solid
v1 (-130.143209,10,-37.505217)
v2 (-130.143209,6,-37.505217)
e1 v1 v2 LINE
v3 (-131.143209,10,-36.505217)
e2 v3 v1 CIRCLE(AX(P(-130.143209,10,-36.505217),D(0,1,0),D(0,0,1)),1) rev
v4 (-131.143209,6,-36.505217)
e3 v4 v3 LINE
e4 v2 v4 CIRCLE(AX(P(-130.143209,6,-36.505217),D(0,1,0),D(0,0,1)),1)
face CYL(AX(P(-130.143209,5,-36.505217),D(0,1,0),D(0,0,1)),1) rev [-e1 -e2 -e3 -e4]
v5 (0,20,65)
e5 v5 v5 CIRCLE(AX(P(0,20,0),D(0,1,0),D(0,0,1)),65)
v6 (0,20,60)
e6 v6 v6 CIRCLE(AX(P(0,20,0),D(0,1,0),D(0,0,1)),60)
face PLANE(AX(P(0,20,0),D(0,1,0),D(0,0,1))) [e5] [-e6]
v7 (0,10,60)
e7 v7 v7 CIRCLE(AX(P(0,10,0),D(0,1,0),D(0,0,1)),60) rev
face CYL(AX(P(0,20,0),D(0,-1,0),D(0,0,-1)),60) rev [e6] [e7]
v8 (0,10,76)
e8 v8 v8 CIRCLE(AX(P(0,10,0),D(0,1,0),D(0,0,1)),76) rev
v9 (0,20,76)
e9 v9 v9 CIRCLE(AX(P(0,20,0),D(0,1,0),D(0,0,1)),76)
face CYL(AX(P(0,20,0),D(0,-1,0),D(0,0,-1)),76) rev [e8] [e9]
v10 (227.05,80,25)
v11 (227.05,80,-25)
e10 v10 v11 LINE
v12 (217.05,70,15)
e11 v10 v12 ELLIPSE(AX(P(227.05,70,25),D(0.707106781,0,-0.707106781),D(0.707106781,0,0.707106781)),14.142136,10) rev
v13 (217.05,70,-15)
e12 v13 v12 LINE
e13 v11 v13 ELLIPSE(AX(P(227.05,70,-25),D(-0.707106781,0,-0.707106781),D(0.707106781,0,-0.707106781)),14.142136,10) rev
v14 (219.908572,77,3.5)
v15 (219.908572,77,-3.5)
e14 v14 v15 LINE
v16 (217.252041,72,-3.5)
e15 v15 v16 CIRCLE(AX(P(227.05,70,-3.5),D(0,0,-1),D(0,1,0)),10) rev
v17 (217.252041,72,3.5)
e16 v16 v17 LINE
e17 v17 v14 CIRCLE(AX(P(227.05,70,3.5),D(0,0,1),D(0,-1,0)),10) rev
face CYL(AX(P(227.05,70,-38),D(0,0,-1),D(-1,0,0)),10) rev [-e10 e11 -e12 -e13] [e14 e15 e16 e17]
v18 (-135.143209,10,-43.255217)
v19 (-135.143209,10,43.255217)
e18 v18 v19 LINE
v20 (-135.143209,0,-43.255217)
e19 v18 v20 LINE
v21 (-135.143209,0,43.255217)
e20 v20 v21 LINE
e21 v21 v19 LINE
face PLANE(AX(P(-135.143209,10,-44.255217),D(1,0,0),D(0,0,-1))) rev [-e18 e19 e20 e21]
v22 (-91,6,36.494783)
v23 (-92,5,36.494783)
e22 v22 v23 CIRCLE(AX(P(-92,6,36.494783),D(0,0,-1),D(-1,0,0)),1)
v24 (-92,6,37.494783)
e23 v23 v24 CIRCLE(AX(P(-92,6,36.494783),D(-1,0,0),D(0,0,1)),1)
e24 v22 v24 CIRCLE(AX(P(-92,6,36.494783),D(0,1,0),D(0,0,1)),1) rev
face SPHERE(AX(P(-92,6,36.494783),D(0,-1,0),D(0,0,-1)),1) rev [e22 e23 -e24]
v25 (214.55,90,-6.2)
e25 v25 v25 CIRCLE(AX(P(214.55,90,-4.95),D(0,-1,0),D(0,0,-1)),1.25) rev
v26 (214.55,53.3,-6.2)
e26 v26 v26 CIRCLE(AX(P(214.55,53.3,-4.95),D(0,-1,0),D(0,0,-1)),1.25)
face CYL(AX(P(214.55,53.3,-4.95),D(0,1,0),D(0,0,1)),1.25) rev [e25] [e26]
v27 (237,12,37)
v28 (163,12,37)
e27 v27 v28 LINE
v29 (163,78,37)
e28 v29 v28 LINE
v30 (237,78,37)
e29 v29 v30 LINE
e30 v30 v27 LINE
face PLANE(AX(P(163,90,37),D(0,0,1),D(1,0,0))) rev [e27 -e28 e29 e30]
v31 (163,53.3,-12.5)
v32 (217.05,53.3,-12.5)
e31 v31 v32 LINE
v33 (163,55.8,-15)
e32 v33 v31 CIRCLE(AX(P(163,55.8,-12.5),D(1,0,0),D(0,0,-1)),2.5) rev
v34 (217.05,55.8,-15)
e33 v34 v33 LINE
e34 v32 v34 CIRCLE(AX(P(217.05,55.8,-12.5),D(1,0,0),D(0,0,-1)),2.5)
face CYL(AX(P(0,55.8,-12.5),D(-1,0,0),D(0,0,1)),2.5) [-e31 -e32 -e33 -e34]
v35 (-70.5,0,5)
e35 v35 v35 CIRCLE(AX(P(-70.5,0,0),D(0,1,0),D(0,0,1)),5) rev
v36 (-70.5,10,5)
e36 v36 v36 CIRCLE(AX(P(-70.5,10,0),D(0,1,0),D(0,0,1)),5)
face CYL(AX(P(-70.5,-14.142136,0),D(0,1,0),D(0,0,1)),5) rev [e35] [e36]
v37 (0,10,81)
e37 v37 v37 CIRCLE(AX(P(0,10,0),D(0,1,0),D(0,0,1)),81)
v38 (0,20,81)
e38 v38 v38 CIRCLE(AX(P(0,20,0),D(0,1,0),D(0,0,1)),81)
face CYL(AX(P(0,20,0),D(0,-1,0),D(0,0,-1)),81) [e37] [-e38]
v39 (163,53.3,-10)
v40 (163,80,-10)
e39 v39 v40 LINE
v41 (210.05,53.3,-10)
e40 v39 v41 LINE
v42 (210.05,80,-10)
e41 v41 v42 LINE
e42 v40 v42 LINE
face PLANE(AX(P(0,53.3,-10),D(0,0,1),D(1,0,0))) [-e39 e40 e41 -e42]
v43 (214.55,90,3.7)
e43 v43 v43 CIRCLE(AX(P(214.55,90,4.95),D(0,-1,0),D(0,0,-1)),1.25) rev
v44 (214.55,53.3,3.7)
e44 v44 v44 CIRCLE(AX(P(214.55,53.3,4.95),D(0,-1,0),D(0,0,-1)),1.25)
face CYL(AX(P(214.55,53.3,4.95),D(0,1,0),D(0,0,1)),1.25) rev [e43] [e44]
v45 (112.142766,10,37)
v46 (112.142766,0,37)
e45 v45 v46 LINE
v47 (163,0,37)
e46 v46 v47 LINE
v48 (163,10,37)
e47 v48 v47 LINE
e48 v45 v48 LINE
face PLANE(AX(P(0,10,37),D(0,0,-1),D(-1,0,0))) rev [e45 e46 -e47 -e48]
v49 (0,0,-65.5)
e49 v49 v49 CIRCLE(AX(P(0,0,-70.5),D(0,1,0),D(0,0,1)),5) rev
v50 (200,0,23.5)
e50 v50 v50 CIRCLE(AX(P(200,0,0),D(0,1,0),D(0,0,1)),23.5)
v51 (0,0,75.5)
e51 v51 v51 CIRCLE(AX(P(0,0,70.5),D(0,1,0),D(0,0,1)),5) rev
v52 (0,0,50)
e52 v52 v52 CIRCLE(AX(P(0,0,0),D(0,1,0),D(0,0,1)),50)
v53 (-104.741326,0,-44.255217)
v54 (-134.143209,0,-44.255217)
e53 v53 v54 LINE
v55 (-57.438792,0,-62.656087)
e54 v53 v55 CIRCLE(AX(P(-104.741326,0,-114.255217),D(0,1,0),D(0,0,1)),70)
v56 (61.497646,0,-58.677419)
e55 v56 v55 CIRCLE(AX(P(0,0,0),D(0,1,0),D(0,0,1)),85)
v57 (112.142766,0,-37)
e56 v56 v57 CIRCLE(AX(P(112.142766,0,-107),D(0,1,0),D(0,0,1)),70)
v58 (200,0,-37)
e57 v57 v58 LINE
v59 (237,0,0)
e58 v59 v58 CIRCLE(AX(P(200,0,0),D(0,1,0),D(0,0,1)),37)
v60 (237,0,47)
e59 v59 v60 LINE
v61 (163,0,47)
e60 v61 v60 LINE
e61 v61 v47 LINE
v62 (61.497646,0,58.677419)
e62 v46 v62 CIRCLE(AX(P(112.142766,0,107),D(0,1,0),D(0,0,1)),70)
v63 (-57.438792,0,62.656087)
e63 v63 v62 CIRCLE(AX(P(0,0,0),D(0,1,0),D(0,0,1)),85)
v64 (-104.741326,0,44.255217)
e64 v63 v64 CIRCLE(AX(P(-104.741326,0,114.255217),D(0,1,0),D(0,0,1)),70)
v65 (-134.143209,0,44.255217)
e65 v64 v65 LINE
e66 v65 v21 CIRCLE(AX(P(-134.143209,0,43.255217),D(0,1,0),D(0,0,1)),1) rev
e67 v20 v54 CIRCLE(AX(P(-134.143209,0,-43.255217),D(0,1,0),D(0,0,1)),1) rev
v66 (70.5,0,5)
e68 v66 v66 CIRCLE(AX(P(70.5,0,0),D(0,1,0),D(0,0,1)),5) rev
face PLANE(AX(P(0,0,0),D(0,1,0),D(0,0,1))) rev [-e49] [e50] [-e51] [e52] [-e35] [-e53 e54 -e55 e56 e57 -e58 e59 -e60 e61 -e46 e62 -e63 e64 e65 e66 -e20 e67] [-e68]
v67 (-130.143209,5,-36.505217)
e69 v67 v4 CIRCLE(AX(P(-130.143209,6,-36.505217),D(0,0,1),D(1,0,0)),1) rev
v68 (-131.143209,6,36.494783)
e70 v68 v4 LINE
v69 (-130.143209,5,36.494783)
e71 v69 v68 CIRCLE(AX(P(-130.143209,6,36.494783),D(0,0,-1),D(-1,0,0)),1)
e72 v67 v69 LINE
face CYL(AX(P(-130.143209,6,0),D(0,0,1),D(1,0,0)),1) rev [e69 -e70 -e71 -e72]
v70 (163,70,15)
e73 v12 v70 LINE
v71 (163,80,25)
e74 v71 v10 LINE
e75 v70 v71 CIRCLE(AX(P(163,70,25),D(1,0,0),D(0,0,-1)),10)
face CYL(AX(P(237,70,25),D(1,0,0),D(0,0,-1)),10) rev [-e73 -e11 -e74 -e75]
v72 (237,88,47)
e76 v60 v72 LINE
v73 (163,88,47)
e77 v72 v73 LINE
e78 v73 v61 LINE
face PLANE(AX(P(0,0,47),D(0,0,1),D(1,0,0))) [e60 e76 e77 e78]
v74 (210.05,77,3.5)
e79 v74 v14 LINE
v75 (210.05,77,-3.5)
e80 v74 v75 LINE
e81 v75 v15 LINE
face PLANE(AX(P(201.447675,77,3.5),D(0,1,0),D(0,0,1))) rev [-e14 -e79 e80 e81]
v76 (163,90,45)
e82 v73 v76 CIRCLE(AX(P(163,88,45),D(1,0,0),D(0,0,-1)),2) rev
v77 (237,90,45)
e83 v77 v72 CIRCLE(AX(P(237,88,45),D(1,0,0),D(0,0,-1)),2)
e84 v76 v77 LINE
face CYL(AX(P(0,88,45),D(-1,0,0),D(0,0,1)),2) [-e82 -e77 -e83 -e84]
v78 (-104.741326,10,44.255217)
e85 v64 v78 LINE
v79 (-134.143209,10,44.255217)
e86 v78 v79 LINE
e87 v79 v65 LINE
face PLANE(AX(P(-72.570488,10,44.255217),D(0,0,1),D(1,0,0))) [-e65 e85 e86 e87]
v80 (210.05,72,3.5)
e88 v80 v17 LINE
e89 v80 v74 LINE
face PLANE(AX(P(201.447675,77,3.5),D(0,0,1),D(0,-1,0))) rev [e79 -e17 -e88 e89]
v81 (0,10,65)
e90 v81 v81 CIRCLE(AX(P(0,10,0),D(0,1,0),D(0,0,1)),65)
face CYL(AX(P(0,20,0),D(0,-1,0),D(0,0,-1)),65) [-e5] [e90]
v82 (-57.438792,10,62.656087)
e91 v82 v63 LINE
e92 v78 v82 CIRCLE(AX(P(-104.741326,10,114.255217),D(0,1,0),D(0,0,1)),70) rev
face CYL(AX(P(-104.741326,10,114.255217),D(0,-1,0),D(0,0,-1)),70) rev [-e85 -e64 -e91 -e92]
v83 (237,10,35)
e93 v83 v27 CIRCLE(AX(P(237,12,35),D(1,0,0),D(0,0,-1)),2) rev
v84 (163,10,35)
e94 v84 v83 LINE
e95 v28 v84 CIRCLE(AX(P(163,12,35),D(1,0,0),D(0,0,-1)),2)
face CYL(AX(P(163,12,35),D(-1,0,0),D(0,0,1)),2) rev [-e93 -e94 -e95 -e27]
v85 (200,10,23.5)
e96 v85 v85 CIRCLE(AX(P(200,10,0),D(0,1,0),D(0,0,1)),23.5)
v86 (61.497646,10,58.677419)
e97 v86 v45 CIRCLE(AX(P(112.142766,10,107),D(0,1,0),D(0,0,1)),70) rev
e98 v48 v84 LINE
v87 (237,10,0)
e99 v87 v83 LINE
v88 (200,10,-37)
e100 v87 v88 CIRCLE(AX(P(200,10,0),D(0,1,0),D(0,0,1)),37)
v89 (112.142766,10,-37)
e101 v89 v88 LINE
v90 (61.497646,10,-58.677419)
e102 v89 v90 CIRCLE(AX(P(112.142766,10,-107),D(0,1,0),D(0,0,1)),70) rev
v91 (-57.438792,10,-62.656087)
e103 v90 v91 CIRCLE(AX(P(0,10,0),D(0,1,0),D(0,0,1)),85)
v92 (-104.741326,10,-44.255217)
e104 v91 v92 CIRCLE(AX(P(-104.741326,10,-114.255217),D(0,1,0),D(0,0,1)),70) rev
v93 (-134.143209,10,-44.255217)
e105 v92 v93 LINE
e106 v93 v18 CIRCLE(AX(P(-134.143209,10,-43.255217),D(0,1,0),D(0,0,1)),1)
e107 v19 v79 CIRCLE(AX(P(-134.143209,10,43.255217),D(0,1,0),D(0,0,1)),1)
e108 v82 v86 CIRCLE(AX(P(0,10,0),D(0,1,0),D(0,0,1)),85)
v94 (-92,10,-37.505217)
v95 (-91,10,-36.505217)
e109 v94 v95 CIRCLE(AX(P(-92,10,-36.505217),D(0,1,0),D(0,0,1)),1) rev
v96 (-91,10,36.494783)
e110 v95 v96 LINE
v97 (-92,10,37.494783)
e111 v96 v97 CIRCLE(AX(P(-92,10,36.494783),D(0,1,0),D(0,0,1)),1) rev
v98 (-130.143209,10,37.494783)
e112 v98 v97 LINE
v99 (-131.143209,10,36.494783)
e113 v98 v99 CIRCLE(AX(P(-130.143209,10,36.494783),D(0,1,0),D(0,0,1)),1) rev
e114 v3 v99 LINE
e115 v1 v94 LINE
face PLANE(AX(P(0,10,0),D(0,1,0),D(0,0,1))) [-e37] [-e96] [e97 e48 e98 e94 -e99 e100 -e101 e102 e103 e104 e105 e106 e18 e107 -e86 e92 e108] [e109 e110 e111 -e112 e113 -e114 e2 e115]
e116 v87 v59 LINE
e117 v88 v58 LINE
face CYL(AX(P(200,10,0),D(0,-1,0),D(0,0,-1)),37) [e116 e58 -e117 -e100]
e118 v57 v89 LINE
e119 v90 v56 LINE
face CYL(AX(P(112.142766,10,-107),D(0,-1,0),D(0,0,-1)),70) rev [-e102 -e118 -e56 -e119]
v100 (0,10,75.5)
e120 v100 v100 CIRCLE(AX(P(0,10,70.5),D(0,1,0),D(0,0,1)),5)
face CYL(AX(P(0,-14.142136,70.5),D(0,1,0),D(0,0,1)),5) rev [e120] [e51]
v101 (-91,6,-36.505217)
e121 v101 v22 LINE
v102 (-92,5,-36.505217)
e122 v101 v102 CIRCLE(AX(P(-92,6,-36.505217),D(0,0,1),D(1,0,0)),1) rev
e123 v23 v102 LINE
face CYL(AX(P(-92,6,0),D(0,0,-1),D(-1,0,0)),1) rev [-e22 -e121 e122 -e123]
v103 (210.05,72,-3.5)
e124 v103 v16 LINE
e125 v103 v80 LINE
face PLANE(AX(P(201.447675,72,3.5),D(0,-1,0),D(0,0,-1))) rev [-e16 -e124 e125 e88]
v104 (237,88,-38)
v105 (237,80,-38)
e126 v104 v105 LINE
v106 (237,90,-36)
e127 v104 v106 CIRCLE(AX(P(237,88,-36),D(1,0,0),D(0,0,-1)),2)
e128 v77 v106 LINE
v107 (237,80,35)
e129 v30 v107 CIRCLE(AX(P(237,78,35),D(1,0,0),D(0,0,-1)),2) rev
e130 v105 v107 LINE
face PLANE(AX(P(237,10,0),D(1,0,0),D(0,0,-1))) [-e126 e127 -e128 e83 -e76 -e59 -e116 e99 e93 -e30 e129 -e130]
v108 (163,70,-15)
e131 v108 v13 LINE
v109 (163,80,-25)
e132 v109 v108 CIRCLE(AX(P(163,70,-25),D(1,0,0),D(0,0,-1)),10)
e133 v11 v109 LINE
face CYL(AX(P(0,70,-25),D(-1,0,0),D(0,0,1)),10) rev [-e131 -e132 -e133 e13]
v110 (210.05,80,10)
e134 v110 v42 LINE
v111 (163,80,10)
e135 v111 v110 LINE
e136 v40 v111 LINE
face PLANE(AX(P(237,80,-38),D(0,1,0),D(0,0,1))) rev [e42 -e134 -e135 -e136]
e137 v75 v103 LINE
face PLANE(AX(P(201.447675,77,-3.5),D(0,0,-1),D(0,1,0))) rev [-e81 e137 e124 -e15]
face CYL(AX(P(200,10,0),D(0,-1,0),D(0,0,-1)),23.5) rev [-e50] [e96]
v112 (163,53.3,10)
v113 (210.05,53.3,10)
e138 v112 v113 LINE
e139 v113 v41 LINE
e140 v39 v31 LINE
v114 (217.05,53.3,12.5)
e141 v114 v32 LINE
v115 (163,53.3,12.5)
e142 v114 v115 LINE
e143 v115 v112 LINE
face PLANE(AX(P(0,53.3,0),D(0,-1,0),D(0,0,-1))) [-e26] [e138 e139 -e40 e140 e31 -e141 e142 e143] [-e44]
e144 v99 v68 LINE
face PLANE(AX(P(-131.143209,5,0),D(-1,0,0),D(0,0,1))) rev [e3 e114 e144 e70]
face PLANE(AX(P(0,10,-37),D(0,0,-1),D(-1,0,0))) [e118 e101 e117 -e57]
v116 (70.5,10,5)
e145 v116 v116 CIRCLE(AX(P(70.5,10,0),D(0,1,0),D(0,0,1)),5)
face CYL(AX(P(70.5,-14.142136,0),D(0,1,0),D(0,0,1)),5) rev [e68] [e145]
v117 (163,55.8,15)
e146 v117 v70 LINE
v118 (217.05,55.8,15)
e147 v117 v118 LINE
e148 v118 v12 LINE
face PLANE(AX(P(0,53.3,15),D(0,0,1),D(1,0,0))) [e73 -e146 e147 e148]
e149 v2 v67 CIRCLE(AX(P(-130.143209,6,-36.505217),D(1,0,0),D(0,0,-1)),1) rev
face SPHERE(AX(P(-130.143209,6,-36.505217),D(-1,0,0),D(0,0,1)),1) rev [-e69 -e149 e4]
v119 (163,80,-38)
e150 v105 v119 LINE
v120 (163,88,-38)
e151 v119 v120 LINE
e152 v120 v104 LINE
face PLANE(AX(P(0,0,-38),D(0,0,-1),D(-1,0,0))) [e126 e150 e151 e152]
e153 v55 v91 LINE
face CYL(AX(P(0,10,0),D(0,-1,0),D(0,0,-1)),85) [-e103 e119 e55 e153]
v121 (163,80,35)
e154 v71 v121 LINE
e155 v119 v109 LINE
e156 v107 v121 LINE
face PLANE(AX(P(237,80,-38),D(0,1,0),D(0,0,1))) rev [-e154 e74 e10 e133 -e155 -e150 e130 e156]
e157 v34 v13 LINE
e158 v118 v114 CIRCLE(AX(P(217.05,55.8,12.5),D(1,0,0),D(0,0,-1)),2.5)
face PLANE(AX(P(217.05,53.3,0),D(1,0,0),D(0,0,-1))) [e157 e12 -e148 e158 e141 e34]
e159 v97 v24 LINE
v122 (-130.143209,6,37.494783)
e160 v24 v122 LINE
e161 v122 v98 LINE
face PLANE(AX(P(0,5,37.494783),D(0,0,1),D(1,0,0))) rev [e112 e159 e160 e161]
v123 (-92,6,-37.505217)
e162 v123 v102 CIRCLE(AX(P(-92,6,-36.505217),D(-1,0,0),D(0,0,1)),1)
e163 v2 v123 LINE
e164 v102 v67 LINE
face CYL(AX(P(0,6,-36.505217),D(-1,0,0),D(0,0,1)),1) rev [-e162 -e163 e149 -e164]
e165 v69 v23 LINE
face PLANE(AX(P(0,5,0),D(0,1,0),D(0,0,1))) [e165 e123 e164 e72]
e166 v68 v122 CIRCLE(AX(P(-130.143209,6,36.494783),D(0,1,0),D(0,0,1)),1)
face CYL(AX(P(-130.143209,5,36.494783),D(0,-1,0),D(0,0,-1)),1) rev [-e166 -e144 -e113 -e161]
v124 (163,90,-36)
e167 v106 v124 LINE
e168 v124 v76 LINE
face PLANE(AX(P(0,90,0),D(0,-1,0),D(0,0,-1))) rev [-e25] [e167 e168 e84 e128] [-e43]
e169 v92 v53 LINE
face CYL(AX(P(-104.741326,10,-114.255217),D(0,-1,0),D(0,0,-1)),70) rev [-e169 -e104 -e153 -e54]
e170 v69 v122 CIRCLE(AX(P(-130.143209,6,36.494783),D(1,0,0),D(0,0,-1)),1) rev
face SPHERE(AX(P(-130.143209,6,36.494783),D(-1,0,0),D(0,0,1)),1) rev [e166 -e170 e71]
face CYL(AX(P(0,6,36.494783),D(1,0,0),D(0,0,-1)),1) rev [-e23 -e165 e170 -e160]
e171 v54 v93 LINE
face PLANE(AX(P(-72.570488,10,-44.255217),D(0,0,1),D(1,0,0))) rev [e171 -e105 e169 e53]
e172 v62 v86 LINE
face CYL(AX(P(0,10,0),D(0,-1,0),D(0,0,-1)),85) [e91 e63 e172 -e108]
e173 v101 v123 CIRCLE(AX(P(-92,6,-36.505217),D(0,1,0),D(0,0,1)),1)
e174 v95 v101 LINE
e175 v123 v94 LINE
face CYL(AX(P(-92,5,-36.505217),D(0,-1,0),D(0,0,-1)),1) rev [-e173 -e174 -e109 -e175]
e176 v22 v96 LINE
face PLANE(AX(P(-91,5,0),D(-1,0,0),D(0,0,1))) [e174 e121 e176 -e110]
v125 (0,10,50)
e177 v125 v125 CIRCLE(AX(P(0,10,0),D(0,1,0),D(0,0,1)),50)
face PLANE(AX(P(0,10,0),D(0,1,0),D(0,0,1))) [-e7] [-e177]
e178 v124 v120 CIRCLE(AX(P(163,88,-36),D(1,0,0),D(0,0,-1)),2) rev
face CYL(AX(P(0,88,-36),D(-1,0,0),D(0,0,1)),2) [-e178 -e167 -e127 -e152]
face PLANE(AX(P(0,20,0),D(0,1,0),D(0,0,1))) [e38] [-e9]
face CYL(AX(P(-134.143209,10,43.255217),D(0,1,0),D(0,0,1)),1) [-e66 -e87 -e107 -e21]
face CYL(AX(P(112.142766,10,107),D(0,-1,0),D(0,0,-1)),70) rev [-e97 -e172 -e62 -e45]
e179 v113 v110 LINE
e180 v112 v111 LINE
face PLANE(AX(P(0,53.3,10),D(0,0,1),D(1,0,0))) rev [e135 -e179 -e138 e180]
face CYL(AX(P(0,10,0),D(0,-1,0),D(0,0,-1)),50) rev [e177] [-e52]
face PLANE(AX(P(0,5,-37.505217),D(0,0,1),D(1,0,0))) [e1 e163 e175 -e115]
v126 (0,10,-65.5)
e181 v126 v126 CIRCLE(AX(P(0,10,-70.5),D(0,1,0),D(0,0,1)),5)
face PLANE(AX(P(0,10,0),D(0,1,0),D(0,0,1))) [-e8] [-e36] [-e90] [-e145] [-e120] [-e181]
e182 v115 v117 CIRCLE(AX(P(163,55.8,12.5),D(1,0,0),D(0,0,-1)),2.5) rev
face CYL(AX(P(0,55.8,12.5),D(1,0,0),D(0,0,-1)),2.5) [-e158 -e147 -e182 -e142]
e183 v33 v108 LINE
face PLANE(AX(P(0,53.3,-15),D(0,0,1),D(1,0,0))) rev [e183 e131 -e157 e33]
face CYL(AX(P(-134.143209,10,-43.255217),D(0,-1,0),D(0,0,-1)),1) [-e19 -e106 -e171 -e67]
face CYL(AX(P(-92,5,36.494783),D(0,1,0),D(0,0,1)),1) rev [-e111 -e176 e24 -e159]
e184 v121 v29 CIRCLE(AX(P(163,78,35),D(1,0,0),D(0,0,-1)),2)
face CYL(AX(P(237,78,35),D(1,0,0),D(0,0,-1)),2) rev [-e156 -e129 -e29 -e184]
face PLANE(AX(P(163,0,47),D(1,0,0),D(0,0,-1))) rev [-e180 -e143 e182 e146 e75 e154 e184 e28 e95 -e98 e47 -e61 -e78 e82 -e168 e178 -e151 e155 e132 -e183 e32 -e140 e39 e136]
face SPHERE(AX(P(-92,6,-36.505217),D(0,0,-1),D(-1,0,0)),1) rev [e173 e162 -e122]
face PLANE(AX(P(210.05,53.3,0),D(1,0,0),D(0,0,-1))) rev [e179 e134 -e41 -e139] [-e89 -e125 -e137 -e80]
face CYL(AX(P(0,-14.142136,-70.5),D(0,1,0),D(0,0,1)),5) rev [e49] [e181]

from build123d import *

# Parameters (mm, degrees)
CROQUIS1_R                   = 50
CROQUIS1_R_2                 = 23.5
SALIENTE_EXTRUIR1_DEPTH      = 10
REDONDEO1_R                  = 70
CROQUIS2_R                   = 81
CROQUIS2_R_2                 = 76
SALIENTE_EXTRUIR2_DEPTH      = 10
CROQUIS8_W                   = 74
CROQUIS8_H                   = 10
SALIENTE_EXTRUIR4_DEPTH      = 10
CROQUIS9_W                   = 74
CROQUIS9_H                   = 10
SALIENTE_EXTRUIR5_DEPTH      = 80
CROQUIS10_W                  = 74
CROQUIS10_H                  = 10
SALIENTE_EXTRUIR6_DEPTH      = 75
REDONDEO3_R                  = 2
REDONDEO4_R                  = 2
REDONDEO5_R                  = 2
REDONDEO6_R                  = 2
CROQUIS12_R                  = 65
CROQUIS12_R_2                = 60
SALIENTE_EXTRUIR12_DEPTH     = 10
CROQUIS13_R                  = 5
CORTAR_EXTRUIR1_DEPTH        = 10
SALIENTE_EXTRUIR13_OUTLINE_R = 1.25
SALIENTE_EXTRUIR13_DEPTH     = 26.7
REDONDEO7_R                  = 10
CORTAR_EXTRUIR2_START        = -36.7
CROQUIS15_R                  = 1.25
CORTAR_EXTRUIR2_DEPTH        = 36.7
REDONDEO9_R                  = 2.5
CROQUIS17_W                  = 7
CROQUIS17_H                  = 5
CORTAR_EXTRUIR3_DEPTH        = 26.95
CROQUIS18_W                  = 40.143208987
CROQUIS18_H                  = 75
CORTAR_EXTRUIR4_DEPTH        = 5
REDONDEO10_R                 = 1
REDONDEO11_R                 = 1


# Read off the part's stored shape, not the designer's step: Saliente-Extruir13
with BuildPart() as part:
    # Croquis1 → Saliente-Extruir1 (new body)
    with BuildSketch(Plane(origin=(0, 0, 0), x_dir=(1, 0, 0), z_dir=(0, 1, 0))):
        with BuildLine():
            ThreePointArc((-72.570488149, -44.255217205), (4.131356705, -84.899539997), (76.524505879, -37))
            Line((76.524505879, -37), (237, -37))
            Line((237, -37), (237, 0))
            ThreePointArc((237, 0), (226.162950904, 26.162950904), (200, 37))
            Line((200, 37), (76.524505879, 37))
            ThreePointArc((76.524505879, 37), (4.131356705, 84.899539997), (-72.570488149, 44.255217205))
            Line((-72.570488149, 44.255217205), (-135.143208987, 44.255217205))
            Line((-135.143208987, 44.255217205), (-135.143208987, -44.255217205))
            Line((-135.143208987, -44.255217205), (-72.570488149, -44.255217205))
        make_face()
        with Locations(Location((0, 0, 0), (0, 0, 270))):
            Circle(CROQUIS1_R, mode=Mode.SUBTRACT)
        with Locations(Location((200, 0, 0), (0, 0, 270))):
            Circle(CROQUIS1_R_2, mode=Mode.SUBTRACT)
    extrude(amount=SALIENTE_EXTRUIR1_DEPTH)

    # Redondeo1
    redondeo1_edges = [part.edges().sort_by_distance(p)[0] for p in [
        (76.524505879, 5, 37),
        (-72.570488149, 5, 44.255217205),
        (-72.570488149, 5, -44.255217205),
        (76.524505879, 5, -37),
    ]]
    fillet(redondeo1_edges, radius=REDONDEO1_R)

    # Croquis2 → Saliente-Extruir2 (add)
    with BuildSketch(Plane(origin=(0, 10, 0), x_dir=(1, 0, 0), z_dir=(0, 1, 0))):
        with Locations(Location((0, 0, 0), (0, 0, 270))):
            Circle(CROQUIS2_R)
        with Locations(Location((0, 0, 0), (0, 0, 270))):
            Circle(CROQUIS2_R_2, mode=Mode.SUBTRACT)
    extrude(amount=SALIENTE_EXTRUIR2_DEPTH)

    # Croquis8 → Saliente-Extruir4 (add)
    with BuildSketch(Plane.XY.offset(37)):
        with Locations((200, 5)):
            Rectangle(CROQUIS8_W, CROQUIS8_H)
    extrude(amount=SALIENTE_EXTRUIR4_DEPTH)

    # Croquis9 → Saliente-Extruir5 (add)
    with BuildSketch(Plane(origin=(0, 10, 0), x_dir=(1, 0, 0), z_dir=(0, 1, 0))):
        with Locations((200, -42)):
            Rectangle(CROQUIS9_W, CROQUIS9_H)
    extrude(amount=SALIENTE_EXTRUIR5_DEPTH)

    # Croquis10 → Saliente-Extruir6 (add)
    with BuildSketch(Plane(origin=(0, 0, 37), x_dir=(-1, 0, 0), z_dir=(0, 0, -1))):
        with Locations((-200, 85)):
            Rectangle(CROQUIS10_W, CROQUIS10_H)
    extrude(amount=SALIENTE_EXTRUIR6_DEPTH)

    # Redondeo3
    redondeo3_edges = [part.edges().sort_by_distance(p)[0] for p in [
        (200, 10, 37),
    ]]
    fillet(redondeo3_edges, radius=REDONDEO3_R)

    # Redondeo4
    redondeo4_edges = [part.edges().sort_by_distance(p)[0] for p in [
        (200, 80, 37),
    ]]
    fillet(redondeo4_edges, radius=REDONDEO4_R)

    # Redondeo5
    redondeo5_edges = [part.edges().sort_by_distance(p)[0] for p in [
        (200, 90, 47),
    ]]
    fillet(redondeo5_edges, radius=REDONDEO5_R)

    # Redondeo6
    redondeo6_edges = [part.edges().sort_by_distance(p)[0] for p in [
        (200, 90, -38),
    ]]
    fillet(redondeo6_edges, radius=REDONDEO6_R)

    # Croquis12 → Saliente-Extruir12 (add)
    with BuildSketch(Plane(origin=(0, 10, 0), x_dir=(1, 0, 0), z_dir=(0, 1, 0))):
        with Locations(Location((0, 0, 0), (0, 0, 270))):
            Circle(CROQUIS12_R)
        with Locations(Location((0, 0, 0), (0, 0, 270))):
            Circle(CROQUIS12_R_2, mode=Mode.SUBTRACT)
    extrude(amount=SALIENTE_EXTRUIR12_DEPTH)

    # Croquis13 → Cortar-Extruir1 (cut)
    with BuildSketch(Plane(origin=(0, 10, 0), x_dir=(1, 0, 0), z_dir=(0, 1, 0))):
        with Locations(Location((-70.5, 0, 0), (0, 0, 270))):
            Circle(CROQUIS13_R)
        with Locations(Location((0, 70.5, 0), (0, 0, 270))):
            Circle(CROQUIS13_R)
        with Locations(Location((70.5, 0, 0), (0, 0, 270))):
            Circle(CROQUIS13_R)
        with Locations(Location((0, -70.5, 0), (0, 0, 270))):
            Circle(CROQUIS13_R)
    extrude(amount=-CORTAR_EXTRUIR1_DEPTH, mode=Mode.SUBTRACT)

    # Saliente-Extruir13 outline → Saliente-Extruir13 (add)
    with BuildSketch(Plane.XZ.offset(-80)):
        Polygon((163, -10), (163, -15), (217.05, -15), (217.05, 15), (163, 15), (163, 10), (210.05, 10), (210.05, -10), align=None)
        with Locations((214.55, -4.95)):
            Circle(SALIENTE_EXTRUIR13_OUTLINE_R, mode=Mode.SUBTRACT)
        with Locations((214.55, 4.95)):
            Circle(SALIENTE_EXTRUIR13_OUTLINE_R, mode=Mode.SUBTRACT)
    extrude(amount=SALIENTE_EXTRUIR13_DEPTH)

    # Redondeo7
    redondeo7_edges = [part.edges().sort_by_distance(p)[0] for p in [
        (190.025, 80, -15),
        (190.025, 80, 15),
        (217.05, 80, 0),
    ]]
    fillet(redondeo7_edges, radius=REDONDEO7_R)

    # Croquis15 → Cortar-Extruir2 (cut)
    with BuildSketch(Plane.XZ.offset(-53.3).offset(CORTAR_EXTRUIR2_START)):
        with Locations(Location((214.55, 4.95, 0), (0, 0, 270))):
            Circle(CROQUIS15_R)
        with Locations(Location((214.55, -4.95, 0), (0, 0, 270))):
            Circle(CROQUIS15_R)
    extrude(amount=CORTAR_EXTRUIR2_DEPTH, mode=Mode.SUBTRACT)

    # Redondeo9
    redondeo9_edges = [part.edges().sort_by_distance(p)[0] for p in [
        (190.025, 53.3, 15),
        (190.025, 53.3, -15),
    ]]
    fillet(redondeo9_edges, radius=REDONDEO9_R)

    # Croquis17 → Cortar-Extruir3 (cut)
    with BuildSketch(Plane(origin=(237, 0, 0), x_dir=(0, 0, -1), z_dir=(1, 0, 0))):
        with Locations((0, 74.5)):
            Rectangle(CROQUIS17_W, CROQUIS17_H)
    extrude(amount=-CORTAR_EXTRUIR3_DEPTH, mode=Mode.SUBTRACT)

    # Croquis18 → Cortar-Extruir4 (cut)
    with BuildSketch(Plane(origin=(0, 10, 0), x_dir=(1, 0, 0), z_dir=(0, 1, 0))):
        with Locations((-111.071604494, 0.005217205)):
            Rectangle(CROQUIS18_W, CROQUIS18_H)
    extrude(amount=-CORTAR_EXTRUIR4_DEPTH, mode=Mode.SUBTRACT)

    # Redondeo10
    redondeo10_edges = [part.edges().sort_by_distance(p)[0] for p in [
        (-91, 7.5, -37.505217205),
        (-111.071604493, 5, 37.494782795),
        (-91, 7.5, 37.494782795),
        (-131.143208987, 5, -0.005217205),
        (-131.143208987, 7.5, 37.494782795),
        (-131.143208987, 7.5, -37.505217205),
        (-91, 5, -0.005217205),
        (-111.071604493, 5, -37.505217205),
    ]]
    fillet(redondeo10_edges, radius=REDONDEO10_R)

    # Redondeo11
    redondeo11_edges = [part.edges().sort_by_distance(p)[0] for p in [
        (-135.143208987, 5, -44.255217205),
        (-135.143208987, 5, 44.255217205),
    ]]
    fillet(redondeo11_edges, radius=REDONDEO11_R)


solid = part.part
